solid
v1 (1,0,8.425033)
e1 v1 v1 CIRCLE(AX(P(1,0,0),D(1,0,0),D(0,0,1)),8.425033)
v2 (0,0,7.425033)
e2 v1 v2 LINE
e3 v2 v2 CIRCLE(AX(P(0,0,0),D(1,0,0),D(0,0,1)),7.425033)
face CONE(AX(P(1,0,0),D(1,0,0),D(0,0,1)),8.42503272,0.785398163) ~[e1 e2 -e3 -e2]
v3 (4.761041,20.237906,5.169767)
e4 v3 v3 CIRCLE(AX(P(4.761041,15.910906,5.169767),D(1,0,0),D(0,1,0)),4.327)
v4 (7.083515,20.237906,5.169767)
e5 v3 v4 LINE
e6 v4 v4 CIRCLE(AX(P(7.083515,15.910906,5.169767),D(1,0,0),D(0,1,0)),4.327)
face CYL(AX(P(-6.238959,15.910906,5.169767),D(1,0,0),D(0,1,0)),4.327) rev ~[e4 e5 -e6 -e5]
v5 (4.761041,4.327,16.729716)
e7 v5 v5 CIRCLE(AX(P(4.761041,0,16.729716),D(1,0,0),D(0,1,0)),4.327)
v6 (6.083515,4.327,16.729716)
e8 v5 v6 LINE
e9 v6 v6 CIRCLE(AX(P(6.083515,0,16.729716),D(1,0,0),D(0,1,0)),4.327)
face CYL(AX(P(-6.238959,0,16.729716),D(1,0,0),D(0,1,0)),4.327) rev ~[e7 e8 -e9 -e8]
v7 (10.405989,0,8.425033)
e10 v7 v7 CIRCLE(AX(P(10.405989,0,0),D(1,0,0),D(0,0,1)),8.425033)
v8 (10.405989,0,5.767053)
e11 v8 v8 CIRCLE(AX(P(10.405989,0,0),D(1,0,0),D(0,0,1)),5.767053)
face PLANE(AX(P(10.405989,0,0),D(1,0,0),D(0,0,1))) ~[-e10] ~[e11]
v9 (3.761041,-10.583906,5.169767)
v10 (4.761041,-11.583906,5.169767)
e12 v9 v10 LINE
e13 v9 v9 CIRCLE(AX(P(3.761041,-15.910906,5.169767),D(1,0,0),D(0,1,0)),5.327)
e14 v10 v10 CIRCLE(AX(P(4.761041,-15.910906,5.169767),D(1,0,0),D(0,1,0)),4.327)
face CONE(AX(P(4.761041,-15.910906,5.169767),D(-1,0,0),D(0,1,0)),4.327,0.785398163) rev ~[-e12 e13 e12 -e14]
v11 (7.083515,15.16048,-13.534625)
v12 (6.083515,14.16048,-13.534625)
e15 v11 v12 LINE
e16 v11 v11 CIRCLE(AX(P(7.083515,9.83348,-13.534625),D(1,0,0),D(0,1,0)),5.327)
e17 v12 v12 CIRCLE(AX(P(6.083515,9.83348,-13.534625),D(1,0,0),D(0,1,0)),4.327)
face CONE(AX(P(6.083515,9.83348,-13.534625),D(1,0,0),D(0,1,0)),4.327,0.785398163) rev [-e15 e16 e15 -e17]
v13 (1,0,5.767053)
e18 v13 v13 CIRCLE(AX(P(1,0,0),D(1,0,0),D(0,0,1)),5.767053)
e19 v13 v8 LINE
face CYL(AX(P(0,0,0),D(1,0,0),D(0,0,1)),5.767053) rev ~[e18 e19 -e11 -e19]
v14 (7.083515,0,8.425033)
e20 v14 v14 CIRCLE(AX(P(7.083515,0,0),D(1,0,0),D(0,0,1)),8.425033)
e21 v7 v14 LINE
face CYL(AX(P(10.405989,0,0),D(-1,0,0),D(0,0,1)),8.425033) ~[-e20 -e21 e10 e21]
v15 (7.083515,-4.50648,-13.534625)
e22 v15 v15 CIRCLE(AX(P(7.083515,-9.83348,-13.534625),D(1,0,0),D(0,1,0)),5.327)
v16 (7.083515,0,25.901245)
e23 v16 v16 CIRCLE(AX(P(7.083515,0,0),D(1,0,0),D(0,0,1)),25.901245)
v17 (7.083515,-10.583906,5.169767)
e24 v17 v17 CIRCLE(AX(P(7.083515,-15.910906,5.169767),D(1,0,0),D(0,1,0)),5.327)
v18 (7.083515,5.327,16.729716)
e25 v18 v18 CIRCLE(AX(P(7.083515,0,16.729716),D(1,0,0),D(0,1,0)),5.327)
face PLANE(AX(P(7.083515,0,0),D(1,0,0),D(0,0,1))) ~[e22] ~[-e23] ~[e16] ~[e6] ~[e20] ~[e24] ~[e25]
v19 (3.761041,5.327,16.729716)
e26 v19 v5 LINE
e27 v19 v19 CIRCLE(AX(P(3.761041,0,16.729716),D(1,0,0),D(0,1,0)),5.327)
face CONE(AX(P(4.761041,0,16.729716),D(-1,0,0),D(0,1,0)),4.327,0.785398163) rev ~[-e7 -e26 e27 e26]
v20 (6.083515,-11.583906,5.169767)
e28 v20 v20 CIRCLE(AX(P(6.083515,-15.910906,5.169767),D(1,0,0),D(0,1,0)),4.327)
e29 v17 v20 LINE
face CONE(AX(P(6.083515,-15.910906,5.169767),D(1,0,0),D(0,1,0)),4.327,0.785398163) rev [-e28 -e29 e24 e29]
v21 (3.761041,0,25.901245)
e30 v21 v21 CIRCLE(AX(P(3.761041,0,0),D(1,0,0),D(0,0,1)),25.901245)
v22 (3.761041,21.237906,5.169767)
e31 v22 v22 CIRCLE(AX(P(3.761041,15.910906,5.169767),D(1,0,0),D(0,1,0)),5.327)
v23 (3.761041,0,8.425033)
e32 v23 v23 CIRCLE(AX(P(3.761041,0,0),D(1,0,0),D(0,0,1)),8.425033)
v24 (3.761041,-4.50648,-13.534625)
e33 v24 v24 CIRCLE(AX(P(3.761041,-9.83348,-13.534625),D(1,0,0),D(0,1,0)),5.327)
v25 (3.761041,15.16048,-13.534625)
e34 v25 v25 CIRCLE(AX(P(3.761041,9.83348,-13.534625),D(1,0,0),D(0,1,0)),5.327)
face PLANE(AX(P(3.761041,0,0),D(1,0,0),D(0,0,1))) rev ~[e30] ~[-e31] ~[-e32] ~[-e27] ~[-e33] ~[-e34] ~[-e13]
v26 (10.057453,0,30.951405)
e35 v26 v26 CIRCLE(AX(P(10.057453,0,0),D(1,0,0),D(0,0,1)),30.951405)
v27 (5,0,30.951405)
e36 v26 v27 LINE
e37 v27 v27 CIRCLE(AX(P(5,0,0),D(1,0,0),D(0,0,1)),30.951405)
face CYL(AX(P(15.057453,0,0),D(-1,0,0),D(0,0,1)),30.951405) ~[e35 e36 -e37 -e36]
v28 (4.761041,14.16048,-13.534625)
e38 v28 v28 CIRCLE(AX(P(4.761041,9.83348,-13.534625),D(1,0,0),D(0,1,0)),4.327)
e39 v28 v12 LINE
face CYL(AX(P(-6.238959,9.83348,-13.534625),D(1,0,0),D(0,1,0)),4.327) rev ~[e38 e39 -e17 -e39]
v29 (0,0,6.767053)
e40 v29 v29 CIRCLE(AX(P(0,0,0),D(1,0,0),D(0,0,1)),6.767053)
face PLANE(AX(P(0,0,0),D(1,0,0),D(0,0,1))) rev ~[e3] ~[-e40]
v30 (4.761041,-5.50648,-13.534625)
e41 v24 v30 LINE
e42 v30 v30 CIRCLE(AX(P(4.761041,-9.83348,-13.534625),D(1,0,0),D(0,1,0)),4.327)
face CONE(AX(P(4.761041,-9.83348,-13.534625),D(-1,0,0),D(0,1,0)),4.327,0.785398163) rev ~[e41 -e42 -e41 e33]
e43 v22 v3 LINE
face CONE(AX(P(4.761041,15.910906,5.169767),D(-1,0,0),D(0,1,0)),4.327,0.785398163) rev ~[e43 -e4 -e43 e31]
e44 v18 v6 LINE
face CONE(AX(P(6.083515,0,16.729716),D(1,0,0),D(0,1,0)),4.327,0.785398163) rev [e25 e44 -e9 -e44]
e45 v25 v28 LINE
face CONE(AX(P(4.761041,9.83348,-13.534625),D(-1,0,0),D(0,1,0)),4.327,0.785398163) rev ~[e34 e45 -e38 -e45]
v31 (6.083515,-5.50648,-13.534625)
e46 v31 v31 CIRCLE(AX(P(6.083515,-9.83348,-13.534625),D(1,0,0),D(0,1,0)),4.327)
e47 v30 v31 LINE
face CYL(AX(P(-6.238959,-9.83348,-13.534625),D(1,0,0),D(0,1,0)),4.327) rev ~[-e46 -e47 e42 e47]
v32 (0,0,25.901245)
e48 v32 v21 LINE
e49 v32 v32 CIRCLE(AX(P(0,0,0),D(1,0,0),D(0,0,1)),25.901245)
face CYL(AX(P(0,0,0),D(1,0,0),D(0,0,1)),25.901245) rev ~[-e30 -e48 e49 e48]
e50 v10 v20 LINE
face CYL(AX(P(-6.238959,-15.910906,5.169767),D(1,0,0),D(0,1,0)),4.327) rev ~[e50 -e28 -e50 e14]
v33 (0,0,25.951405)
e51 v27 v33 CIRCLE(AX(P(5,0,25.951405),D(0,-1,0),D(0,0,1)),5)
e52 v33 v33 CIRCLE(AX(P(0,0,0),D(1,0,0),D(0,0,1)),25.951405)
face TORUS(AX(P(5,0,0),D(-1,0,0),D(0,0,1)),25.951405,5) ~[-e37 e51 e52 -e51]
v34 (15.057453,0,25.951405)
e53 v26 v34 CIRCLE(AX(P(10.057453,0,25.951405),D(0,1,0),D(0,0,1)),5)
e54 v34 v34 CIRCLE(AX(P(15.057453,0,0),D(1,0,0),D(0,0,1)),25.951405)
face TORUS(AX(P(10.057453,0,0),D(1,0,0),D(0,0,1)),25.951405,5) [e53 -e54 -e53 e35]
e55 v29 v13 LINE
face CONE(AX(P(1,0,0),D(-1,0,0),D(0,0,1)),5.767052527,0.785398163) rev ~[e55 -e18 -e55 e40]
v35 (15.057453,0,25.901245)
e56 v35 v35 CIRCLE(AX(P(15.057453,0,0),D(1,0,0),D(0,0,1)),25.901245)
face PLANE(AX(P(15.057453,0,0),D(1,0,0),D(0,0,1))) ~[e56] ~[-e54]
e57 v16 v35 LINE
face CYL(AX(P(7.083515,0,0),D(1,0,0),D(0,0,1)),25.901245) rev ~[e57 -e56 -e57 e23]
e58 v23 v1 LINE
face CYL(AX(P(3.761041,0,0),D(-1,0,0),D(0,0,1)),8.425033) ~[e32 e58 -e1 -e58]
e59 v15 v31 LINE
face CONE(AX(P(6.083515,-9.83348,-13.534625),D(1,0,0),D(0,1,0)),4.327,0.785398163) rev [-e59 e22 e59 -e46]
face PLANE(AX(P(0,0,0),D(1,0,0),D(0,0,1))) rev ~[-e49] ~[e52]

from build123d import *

# Parameters (mm, degrees)
F3_D     = 8.654
F3_DEPTH = 10
F3_TIP   = 2.5999238985
F4_R     = 5
F5_SIZE  = 1


with BuildPart() as f1:
    # F0 (on Front) → F1 (revolve)
    with BuildSketch(Plane.XZ):
        Polygon((15.0574529544, 30.9514049441), (0, 30.9514049441), (0, 25.9012449533), (3.761041211, 25.9012449533), (3.761041211, 8.42503272), (0, 8.42503272), (0, 5.7670525275), (10.4059893638, 5.7670525275), (10.4059893638, 8.42503272), (7.0835147053, 8.42503272), (7.0835147053, 25.9012449533), (15.0574529544, 25.9012449533), align=None)
    revolve(axis=Axis((5.2029946819, 0, 0), (1, 0, 0)))

    # F3
    with Locations(Plane(origin=(3.761041211, 0, 0), x_dir=(0, -1, 0), z_dir=(-1, 0, 0))):
        with Locations((-15.9109056188, 5.1697666204), (0, 16.7297162116), (15.9109056188, 5.1697666204), (9.8334804642, -13.5346247262), (-9.8334804642, -13.5346247262)):
            Hole(F3_D / 2, depth=F3_DEPTH)
            with Locations((0, 0, -(F3_DEPTH + F3_TIP / 2))):  # 118° drill point
                Cone(0, F3_D / 2, F3_TIP, mode=Mode.SUBTRACT)

    # F4
    f4_edges = [f1.edges().sort_by_distance(p)[0] for p in [
        (0, 0, -30.951405),
        (15.057453, 0, -30.951405),
    ]]
    fillet(f4_edges, radius=F4_R)

    # F5
    f5_edges = [f1.edges().sort_by_distance(p)[0] for p in [
        (0, 0, -8.425033),
        (0, 0, -5.767053),
        (7.083515, 4.327, 16.729716),
        (7.083515, 14.16048, -13.534625),
        (7.083515, -11.583906, 5.169767),
        (7.083515, -5.50648, -13.534625),
        (3.761041, 14.16048, -13.534625),
        (3.761041, 20.237906, 5.169767),
        (3.761041, 4.327, 16.729716),
        (3.761041, -5.50648, -13.534625),
        (3.761041, -11.583906, 5.169767),
    ]]
    chamfer(f5_edges, length=F5_SIZE)


solid = f1.part
